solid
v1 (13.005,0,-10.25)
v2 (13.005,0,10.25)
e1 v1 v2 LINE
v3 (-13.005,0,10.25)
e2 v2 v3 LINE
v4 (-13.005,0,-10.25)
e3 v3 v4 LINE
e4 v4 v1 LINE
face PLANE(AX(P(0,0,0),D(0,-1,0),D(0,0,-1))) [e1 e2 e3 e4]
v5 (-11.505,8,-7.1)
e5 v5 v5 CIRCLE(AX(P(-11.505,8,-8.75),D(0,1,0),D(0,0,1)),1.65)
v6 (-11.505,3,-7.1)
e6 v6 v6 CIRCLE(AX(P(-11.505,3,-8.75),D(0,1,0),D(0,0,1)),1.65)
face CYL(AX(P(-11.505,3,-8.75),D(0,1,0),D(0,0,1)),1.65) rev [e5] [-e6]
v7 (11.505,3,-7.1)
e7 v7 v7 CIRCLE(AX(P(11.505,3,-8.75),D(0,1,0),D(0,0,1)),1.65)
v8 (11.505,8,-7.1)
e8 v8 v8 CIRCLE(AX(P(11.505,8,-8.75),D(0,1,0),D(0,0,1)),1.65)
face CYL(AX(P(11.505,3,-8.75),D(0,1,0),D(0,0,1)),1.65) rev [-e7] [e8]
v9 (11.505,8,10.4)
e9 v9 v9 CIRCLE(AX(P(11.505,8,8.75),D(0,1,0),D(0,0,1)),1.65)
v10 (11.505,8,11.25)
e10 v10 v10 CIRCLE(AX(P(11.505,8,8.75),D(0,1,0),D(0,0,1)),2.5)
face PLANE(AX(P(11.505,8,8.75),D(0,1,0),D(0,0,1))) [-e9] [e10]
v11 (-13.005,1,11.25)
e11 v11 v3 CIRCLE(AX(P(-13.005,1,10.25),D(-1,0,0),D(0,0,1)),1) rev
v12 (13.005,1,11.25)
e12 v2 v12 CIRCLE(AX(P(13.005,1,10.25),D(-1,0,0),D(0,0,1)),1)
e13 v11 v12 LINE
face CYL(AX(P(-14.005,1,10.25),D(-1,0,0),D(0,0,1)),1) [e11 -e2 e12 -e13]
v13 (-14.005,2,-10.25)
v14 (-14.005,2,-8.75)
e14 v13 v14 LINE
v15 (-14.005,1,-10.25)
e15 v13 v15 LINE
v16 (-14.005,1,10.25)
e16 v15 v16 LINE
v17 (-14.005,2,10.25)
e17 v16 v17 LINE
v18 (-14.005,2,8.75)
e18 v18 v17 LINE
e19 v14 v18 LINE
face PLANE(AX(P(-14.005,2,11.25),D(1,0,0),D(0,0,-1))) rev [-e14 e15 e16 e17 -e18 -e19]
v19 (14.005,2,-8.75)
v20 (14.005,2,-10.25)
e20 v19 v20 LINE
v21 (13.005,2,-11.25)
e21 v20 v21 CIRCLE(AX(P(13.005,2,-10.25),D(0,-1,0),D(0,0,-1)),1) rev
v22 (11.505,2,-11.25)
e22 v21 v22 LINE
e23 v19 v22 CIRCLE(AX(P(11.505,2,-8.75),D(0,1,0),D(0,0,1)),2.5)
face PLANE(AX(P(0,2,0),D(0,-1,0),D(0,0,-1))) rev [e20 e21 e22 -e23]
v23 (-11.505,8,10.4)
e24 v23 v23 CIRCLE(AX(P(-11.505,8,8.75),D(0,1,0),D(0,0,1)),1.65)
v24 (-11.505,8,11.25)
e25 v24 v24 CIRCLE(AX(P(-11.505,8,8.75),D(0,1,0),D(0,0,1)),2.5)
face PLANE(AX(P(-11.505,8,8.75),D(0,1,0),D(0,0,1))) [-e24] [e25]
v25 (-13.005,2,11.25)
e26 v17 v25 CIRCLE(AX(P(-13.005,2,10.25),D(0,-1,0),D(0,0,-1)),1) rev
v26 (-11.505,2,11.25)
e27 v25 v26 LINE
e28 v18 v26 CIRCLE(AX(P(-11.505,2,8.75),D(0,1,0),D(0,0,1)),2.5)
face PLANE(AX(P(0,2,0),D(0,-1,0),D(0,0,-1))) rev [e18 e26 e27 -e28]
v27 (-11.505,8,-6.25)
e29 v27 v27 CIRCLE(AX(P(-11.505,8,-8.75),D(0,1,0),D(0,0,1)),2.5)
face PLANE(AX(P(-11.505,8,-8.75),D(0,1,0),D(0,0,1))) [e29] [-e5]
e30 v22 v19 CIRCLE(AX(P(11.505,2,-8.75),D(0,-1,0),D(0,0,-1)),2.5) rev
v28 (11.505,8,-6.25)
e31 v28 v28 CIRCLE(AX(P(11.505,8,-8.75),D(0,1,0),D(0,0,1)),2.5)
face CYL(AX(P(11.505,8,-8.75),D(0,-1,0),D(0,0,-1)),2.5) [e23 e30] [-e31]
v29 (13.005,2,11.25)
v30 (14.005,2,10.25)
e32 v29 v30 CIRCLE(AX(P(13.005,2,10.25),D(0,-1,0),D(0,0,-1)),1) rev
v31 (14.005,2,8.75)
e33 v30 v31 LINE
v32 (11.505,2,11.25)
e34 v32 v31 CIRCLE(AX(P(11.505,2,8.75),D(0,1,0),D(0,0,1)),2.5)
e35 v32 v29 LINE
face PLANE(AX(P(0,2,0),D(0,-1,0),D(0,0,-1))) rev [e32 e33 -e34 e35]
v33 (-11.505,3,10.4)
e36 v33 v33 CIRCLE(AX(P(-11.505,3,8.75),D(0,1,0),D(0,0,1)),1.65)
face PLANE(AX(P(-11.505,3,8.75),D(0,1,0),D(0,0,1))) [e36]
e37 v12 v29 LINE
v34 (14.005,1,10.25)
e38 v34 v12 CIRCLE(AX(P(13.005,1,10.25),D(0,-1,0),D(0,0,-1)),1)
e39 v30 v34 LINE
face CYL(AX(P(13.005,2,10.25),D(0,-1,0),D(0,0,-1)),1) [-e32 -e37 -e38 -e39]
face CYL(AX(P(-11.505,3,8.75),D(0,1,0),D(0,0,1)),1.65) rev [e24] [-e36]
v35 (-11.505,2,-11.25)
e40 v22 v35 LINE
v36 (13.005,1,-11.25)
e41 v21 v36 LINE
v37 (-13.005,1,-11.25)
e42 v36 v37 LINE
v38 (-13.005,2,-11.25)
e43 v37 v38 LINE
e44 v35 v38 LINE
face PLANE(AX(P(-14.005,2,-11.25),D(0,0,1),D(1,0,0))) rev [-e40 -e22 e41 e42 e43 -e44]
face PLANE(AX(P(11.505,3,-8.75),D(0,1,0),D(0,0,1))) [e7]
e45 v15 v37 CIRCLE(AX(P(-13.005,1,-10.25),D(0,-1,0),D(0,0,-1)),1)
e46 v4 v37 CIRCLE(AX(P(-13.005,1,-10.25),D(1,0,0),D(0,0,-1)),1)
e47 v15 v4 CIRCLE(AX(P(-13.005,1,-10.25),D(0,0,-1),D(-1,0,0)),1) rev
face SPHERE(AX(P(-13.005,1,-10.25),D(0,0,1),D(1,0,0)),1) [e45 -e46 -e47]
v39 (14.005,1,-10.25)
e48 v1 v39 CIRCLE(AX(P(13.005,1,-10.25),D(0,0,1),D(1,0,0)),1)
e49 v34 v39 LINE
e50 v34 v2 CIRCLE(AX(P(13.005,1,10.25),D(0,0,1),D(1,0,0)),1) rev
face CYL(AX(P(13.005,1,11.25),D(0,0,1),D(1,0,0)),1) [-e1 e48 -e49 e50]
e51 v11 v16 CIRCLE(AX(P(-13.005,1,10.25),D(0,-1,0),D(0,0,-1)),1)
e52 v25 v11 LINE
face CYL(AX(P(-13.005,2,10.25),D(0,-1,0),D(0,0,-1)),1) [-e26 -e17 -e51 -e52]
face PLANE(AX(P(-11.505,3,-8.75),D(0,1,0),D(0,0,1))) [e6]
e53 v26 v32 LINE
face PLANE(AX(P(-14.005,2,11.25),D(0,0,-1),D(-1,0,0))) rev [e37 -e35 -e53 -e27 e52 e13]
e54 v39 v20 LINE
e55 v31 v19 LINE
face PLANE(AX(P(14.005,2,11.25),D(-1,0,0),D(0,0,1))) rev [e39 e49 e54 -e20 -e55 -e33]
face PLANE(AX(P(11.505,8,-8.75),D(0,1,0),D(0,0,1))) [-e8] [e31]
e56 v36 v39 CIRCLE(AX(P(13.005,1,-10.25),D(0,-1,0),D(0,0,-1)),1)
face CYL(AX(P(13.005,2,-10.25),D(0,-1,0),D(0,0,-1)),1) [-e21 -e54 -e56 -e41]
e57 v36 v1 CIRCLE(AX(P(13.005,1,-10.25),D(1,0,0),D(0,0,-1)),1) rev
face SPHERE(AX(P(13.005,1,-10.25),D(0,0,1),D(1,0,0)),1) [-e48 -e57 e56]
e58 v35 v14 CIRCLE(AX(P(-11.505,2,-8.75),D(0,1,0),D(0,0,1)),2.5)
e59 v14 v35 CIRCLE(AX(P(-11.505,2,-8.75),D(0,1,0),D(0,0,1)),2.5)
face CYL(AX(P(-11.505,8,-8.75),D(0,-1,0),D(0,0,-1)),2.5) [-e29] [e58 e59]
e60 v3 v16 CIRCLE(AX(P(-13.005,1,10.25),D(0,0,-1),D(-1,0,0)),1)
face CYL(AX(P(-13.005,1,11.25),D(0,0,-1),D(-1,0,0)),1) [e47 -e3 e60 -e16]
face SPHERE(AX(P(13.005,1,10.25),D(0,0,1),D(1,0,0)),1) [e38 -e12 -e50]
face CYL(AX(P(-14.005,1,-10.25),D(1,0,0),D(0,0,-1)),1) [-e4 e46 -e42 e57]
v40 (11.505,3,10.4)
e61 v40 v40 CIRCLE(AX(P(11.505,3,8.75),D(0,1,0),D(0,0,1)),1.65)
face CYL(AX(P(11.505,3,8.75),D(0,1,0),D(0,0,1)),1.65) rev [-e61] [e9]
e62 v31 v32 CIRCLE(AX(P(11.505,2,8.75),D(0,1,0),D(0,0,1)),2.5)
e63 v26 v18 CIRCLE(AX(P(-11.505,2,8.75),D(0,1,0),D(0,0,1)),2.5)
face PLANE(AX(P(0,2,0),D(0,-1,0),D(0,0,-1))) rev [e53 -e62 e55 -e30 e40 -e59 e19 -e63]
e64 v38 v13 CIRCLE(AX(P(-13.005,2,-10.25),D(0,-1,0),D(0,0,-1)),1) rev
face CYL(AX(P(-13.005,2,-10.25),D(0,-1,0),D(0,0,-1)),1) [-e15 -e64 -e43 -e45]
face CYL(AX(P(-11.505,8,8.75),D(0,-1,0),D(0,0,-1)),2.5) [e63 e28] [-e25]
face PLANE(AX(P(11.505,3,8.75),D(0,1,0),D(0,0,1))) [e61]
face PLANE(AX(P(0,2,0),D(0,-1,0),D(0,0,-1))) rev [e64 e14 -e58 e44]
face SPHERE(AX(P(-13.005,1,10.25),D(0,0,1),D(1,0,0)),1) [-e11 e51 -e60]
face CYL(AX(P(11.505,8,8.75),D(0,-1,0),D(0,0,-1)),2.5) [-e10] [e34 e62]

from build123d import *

# Parameters (mm, degrees)
CROQUIS1_W              = 28.01
CROQUIS1_H              = 22.5
SALIENTE_EXTRUIR1_DEPTH = 2
CROQUIS3_R              = 2.5
SALIENTE_EXTRUIR2_DEPTH = 6
CROQUIS4_R              = 1.65
CORTAR_EXTRUIR1_DEPTH   = 5
REDONDEO1_R             = 1
REDONDEO2_R             = 1


with BuildPart() as part:
    # Croquis1 → Saliente-Extruir1 (new body)
    with BuildSketch(Plane(origin=(0, 0, 0), x_dir=(1, 0, 0), z_dir=(0, 1, 0))):
        Rectangle(CROQUIS1_W, CROQUIS1_H)
    extrude(amount=SALIENTE_EXTRUIR1_DEPTH)

    # Croquis3 → Saliente-Extruir2 (add)
    with BuildSketch(Plane(origin=(0, 2, 0), x_dir=(1, 0, 0), z_dir=(0, 1, 0))):
        with Locations(Location((-11.505, 8.75, 0), (0, 0, 90))):
            Circle(CROQUIS3_R)
        with Locations(Location((11.505, 8.75, 0), (0, 0, 90))):
            Circle(CROQUIS3_R)
        with Locations(Location((11.505, -8.75, 0), (0, 0, 270))):
            Circle(CROQUIS3_R)
        with Locations(Location((-11.505, -8.75, 0), (0, 0, 270))):
            Circle(CROQUIS3_R)
    extrude(amount=SALIENTE_EXTRUIR2_DEPTH)

    # Croquis4 → Cortar-Extruir1 (cut)
    with BuildSketch(Plane(origin=(0, 8, 0), x_dir=(1, 0, 0), z_dir=(0, 1, 0))):
        with Locations(Location((-11.505, 8.75, 0), (0, 0, 270))):
            Circle(CROQUIS4_R)
        with Locations(Location((11.505, 8.75, 0), (0, 0, 270))):
            Circle(CROQUIS4_R)
        with Locations(Location((11.505, -8.75, 0), (0, 0, 270))):
            Circle(CROQUIS4_R)
        with Locations(Location((-11.505, -8.75, 0), (0, 0, 270))):
            Circle(CROQUIS4_R)
    extrude(amount=-CORTAR_EXTRUIR1_DEPTH, mode=Mode.SUBTRACT)

    # Redondeo1
    redondeo1_edges = [part.edges().sort_by_distance(p)[0] for p in [
        (0, 0, 11.25),
        (-14.005, 0, 0),
        (0, 0, -11.25),
        (14.005, 0, 0),
    ]]
    fillet(redondeo1_edges, radius=REDONDEO1_R)

    # Redondeo2
    # the kernel refuses this fillet: 1 mm, written as the material it takes off along each edge
    with BuildSketch(Plane(origin=(-13.005, 1, 10.25), x_dir=(-1, 0, 0), z_dir=(0, 0, 1))) as redondeo2_piece_1_section:
        Polygon((0, 0), (REDONDEO2_R, 0), (REDONDEO2_R, REDONDEO2_R), (0, REDONDEO2_R), align=None)
    redondeo2_piece_1 = extrude(amount=REDONDEO2_R, mode=Mode.PRIVATE)
    redondeo2_piece_1 = redondeo2_piece_1 - Plane(origin=(-13.005, 1, 10.25), x_dir=(0.7071067811865475, 0.7071067811865475, 0), z_dir=(0, 0, 1)) * Sphere(REDONDEO2_R, mode=Mode.PRIVATE)
    add(redondeo2_piece_1, mode=Mode.SUBTRACT)
    with BuildSketch(Plane(origin=(-13.005, 1, -10.25), x_dir=(0, 0, -1), z_dir=(-1, 0, 0))) as redondeo2_piece_2_section:
        Polygon((0, 0), (REDONDEO2_R, 0), (REDONDEO2_R, REDONDEO2_R), (0, REDONDEO2_R), align=None)
    redondeo2_piece_2 = extrude(amount=REDONDEO2_R, mode=Mode.PRIVATE)
    redondeo2_piece_2 = redondeo2_piece_2 - Plane(origin=(-13.005, 1, -10.25), x_dir=(0, 0.7071067811865475, 0.7071067811865475), z_dir=(-1, 0, 0)) * Sphere(REDONDEO2_R, mode=Mode.PRIVATE)
    add(redondeo2_piece_2, mode=Mode.SUBTRACT)
    with BuildSketch(Plane(origin=(13.005, 1, 10.25), x_dir=(1, 0, 0), z_dir=(0, 0, 1))) as redondeo2_piece_3_section:
        Polygon((0, 0), (REDONDEO2_R, 0), (REDONDEO2_R, -REDONDEO2_R), (0, -REDONDEO2_R), align=None)
    redondeo2_piece_3 = extrude(amount=REDONDEO2_R, mode=Mode.PRIVATE)
    redondeo2_piece_3 = redondeo2_piece_3 - Plane(origin=(13.005, 1, 10.25), x_dir=(-0.7071067811865475, 0.7071067811865475, 0), z_dir=(0, 0, 1)) * Sphere(REDONDEO2_R, mode=Mode.PRIVATE)
    add(redondeo2_piece_3, mode=Mode.SUBTRACT)
    with BuildSketch(Plane(origin=(13.005, 1, -10.25), x_dir=(0, 0, -1), z_dir=(1, 0, 0))) as redondeo2_piece_4_section:
        Polygon((0, 0), (REDONDEO2_R, 0), (REDONDEO2_R, -REDONDEO2_R), (0, -REDONDEO2_R), align=None)
    redondeo2_piece_4 = extrude(amount=REDONDEO2_R, mode=Mode.PRIVATE)
    redondeo2_piece_4 = redondeo2_piece_4 - Plane(origin=(13.005, 1, -10.25), x_dir=(0, 0.7071067811865475, 0.7071067811865475), z_dir=(1, 0, 0)) * Sphere(REDONDEO2_R, mode=Mode.PRIVATE)
    add(redondeo2_piece_4, mode=Mode.SUBTRACT)
    with BuildSketch(Plane(origin=(14.005, 1, 11.25), x_dir=(-1, 0, 0), z_dir=(0, 1, 0)), Plane(origin=(14.005, 1, -11.25), x_dir=(0, 0, 1), z_dir=(0, 1, 0))) as redondeo2_piece_5:
        with BuildLine():
            CenterArc((REDONDEO2_R, -REDONDEO2_R), REDONDEO2_R, 90, 90)
            Line((0, -REDONDEO2_R), (0, 0))
            Line((0, 0), (REDONDEO2_R, 0))
        make_face()
    extrude(amount=3.5, mode=Mode.SUBTRACT)
    with BuildSketch(Plane(origin=(-14.005, 1, 11.25), x_dir=(1, 0, 0), z_dir=(0, 1, 0)), Plane(origin=(-14.005, 1, -11.25), x_dir=(0, 0, 1), z_dir=(0, 1, 0))) as redondeo2_piece_6:
        with BuildLine():
            CenterArc((REDONDEO2_R, REDONDEO2_R), REDONDEO2_R, 180, 90)
            Line((0, REDONDEO2_R), (0, 0))
            Line((0, 0), (REDONDEO2_R, 0))
        make_face()
    extrude(amount=3.5, mode=Mode.SUBTRACT)


solid = part.part
